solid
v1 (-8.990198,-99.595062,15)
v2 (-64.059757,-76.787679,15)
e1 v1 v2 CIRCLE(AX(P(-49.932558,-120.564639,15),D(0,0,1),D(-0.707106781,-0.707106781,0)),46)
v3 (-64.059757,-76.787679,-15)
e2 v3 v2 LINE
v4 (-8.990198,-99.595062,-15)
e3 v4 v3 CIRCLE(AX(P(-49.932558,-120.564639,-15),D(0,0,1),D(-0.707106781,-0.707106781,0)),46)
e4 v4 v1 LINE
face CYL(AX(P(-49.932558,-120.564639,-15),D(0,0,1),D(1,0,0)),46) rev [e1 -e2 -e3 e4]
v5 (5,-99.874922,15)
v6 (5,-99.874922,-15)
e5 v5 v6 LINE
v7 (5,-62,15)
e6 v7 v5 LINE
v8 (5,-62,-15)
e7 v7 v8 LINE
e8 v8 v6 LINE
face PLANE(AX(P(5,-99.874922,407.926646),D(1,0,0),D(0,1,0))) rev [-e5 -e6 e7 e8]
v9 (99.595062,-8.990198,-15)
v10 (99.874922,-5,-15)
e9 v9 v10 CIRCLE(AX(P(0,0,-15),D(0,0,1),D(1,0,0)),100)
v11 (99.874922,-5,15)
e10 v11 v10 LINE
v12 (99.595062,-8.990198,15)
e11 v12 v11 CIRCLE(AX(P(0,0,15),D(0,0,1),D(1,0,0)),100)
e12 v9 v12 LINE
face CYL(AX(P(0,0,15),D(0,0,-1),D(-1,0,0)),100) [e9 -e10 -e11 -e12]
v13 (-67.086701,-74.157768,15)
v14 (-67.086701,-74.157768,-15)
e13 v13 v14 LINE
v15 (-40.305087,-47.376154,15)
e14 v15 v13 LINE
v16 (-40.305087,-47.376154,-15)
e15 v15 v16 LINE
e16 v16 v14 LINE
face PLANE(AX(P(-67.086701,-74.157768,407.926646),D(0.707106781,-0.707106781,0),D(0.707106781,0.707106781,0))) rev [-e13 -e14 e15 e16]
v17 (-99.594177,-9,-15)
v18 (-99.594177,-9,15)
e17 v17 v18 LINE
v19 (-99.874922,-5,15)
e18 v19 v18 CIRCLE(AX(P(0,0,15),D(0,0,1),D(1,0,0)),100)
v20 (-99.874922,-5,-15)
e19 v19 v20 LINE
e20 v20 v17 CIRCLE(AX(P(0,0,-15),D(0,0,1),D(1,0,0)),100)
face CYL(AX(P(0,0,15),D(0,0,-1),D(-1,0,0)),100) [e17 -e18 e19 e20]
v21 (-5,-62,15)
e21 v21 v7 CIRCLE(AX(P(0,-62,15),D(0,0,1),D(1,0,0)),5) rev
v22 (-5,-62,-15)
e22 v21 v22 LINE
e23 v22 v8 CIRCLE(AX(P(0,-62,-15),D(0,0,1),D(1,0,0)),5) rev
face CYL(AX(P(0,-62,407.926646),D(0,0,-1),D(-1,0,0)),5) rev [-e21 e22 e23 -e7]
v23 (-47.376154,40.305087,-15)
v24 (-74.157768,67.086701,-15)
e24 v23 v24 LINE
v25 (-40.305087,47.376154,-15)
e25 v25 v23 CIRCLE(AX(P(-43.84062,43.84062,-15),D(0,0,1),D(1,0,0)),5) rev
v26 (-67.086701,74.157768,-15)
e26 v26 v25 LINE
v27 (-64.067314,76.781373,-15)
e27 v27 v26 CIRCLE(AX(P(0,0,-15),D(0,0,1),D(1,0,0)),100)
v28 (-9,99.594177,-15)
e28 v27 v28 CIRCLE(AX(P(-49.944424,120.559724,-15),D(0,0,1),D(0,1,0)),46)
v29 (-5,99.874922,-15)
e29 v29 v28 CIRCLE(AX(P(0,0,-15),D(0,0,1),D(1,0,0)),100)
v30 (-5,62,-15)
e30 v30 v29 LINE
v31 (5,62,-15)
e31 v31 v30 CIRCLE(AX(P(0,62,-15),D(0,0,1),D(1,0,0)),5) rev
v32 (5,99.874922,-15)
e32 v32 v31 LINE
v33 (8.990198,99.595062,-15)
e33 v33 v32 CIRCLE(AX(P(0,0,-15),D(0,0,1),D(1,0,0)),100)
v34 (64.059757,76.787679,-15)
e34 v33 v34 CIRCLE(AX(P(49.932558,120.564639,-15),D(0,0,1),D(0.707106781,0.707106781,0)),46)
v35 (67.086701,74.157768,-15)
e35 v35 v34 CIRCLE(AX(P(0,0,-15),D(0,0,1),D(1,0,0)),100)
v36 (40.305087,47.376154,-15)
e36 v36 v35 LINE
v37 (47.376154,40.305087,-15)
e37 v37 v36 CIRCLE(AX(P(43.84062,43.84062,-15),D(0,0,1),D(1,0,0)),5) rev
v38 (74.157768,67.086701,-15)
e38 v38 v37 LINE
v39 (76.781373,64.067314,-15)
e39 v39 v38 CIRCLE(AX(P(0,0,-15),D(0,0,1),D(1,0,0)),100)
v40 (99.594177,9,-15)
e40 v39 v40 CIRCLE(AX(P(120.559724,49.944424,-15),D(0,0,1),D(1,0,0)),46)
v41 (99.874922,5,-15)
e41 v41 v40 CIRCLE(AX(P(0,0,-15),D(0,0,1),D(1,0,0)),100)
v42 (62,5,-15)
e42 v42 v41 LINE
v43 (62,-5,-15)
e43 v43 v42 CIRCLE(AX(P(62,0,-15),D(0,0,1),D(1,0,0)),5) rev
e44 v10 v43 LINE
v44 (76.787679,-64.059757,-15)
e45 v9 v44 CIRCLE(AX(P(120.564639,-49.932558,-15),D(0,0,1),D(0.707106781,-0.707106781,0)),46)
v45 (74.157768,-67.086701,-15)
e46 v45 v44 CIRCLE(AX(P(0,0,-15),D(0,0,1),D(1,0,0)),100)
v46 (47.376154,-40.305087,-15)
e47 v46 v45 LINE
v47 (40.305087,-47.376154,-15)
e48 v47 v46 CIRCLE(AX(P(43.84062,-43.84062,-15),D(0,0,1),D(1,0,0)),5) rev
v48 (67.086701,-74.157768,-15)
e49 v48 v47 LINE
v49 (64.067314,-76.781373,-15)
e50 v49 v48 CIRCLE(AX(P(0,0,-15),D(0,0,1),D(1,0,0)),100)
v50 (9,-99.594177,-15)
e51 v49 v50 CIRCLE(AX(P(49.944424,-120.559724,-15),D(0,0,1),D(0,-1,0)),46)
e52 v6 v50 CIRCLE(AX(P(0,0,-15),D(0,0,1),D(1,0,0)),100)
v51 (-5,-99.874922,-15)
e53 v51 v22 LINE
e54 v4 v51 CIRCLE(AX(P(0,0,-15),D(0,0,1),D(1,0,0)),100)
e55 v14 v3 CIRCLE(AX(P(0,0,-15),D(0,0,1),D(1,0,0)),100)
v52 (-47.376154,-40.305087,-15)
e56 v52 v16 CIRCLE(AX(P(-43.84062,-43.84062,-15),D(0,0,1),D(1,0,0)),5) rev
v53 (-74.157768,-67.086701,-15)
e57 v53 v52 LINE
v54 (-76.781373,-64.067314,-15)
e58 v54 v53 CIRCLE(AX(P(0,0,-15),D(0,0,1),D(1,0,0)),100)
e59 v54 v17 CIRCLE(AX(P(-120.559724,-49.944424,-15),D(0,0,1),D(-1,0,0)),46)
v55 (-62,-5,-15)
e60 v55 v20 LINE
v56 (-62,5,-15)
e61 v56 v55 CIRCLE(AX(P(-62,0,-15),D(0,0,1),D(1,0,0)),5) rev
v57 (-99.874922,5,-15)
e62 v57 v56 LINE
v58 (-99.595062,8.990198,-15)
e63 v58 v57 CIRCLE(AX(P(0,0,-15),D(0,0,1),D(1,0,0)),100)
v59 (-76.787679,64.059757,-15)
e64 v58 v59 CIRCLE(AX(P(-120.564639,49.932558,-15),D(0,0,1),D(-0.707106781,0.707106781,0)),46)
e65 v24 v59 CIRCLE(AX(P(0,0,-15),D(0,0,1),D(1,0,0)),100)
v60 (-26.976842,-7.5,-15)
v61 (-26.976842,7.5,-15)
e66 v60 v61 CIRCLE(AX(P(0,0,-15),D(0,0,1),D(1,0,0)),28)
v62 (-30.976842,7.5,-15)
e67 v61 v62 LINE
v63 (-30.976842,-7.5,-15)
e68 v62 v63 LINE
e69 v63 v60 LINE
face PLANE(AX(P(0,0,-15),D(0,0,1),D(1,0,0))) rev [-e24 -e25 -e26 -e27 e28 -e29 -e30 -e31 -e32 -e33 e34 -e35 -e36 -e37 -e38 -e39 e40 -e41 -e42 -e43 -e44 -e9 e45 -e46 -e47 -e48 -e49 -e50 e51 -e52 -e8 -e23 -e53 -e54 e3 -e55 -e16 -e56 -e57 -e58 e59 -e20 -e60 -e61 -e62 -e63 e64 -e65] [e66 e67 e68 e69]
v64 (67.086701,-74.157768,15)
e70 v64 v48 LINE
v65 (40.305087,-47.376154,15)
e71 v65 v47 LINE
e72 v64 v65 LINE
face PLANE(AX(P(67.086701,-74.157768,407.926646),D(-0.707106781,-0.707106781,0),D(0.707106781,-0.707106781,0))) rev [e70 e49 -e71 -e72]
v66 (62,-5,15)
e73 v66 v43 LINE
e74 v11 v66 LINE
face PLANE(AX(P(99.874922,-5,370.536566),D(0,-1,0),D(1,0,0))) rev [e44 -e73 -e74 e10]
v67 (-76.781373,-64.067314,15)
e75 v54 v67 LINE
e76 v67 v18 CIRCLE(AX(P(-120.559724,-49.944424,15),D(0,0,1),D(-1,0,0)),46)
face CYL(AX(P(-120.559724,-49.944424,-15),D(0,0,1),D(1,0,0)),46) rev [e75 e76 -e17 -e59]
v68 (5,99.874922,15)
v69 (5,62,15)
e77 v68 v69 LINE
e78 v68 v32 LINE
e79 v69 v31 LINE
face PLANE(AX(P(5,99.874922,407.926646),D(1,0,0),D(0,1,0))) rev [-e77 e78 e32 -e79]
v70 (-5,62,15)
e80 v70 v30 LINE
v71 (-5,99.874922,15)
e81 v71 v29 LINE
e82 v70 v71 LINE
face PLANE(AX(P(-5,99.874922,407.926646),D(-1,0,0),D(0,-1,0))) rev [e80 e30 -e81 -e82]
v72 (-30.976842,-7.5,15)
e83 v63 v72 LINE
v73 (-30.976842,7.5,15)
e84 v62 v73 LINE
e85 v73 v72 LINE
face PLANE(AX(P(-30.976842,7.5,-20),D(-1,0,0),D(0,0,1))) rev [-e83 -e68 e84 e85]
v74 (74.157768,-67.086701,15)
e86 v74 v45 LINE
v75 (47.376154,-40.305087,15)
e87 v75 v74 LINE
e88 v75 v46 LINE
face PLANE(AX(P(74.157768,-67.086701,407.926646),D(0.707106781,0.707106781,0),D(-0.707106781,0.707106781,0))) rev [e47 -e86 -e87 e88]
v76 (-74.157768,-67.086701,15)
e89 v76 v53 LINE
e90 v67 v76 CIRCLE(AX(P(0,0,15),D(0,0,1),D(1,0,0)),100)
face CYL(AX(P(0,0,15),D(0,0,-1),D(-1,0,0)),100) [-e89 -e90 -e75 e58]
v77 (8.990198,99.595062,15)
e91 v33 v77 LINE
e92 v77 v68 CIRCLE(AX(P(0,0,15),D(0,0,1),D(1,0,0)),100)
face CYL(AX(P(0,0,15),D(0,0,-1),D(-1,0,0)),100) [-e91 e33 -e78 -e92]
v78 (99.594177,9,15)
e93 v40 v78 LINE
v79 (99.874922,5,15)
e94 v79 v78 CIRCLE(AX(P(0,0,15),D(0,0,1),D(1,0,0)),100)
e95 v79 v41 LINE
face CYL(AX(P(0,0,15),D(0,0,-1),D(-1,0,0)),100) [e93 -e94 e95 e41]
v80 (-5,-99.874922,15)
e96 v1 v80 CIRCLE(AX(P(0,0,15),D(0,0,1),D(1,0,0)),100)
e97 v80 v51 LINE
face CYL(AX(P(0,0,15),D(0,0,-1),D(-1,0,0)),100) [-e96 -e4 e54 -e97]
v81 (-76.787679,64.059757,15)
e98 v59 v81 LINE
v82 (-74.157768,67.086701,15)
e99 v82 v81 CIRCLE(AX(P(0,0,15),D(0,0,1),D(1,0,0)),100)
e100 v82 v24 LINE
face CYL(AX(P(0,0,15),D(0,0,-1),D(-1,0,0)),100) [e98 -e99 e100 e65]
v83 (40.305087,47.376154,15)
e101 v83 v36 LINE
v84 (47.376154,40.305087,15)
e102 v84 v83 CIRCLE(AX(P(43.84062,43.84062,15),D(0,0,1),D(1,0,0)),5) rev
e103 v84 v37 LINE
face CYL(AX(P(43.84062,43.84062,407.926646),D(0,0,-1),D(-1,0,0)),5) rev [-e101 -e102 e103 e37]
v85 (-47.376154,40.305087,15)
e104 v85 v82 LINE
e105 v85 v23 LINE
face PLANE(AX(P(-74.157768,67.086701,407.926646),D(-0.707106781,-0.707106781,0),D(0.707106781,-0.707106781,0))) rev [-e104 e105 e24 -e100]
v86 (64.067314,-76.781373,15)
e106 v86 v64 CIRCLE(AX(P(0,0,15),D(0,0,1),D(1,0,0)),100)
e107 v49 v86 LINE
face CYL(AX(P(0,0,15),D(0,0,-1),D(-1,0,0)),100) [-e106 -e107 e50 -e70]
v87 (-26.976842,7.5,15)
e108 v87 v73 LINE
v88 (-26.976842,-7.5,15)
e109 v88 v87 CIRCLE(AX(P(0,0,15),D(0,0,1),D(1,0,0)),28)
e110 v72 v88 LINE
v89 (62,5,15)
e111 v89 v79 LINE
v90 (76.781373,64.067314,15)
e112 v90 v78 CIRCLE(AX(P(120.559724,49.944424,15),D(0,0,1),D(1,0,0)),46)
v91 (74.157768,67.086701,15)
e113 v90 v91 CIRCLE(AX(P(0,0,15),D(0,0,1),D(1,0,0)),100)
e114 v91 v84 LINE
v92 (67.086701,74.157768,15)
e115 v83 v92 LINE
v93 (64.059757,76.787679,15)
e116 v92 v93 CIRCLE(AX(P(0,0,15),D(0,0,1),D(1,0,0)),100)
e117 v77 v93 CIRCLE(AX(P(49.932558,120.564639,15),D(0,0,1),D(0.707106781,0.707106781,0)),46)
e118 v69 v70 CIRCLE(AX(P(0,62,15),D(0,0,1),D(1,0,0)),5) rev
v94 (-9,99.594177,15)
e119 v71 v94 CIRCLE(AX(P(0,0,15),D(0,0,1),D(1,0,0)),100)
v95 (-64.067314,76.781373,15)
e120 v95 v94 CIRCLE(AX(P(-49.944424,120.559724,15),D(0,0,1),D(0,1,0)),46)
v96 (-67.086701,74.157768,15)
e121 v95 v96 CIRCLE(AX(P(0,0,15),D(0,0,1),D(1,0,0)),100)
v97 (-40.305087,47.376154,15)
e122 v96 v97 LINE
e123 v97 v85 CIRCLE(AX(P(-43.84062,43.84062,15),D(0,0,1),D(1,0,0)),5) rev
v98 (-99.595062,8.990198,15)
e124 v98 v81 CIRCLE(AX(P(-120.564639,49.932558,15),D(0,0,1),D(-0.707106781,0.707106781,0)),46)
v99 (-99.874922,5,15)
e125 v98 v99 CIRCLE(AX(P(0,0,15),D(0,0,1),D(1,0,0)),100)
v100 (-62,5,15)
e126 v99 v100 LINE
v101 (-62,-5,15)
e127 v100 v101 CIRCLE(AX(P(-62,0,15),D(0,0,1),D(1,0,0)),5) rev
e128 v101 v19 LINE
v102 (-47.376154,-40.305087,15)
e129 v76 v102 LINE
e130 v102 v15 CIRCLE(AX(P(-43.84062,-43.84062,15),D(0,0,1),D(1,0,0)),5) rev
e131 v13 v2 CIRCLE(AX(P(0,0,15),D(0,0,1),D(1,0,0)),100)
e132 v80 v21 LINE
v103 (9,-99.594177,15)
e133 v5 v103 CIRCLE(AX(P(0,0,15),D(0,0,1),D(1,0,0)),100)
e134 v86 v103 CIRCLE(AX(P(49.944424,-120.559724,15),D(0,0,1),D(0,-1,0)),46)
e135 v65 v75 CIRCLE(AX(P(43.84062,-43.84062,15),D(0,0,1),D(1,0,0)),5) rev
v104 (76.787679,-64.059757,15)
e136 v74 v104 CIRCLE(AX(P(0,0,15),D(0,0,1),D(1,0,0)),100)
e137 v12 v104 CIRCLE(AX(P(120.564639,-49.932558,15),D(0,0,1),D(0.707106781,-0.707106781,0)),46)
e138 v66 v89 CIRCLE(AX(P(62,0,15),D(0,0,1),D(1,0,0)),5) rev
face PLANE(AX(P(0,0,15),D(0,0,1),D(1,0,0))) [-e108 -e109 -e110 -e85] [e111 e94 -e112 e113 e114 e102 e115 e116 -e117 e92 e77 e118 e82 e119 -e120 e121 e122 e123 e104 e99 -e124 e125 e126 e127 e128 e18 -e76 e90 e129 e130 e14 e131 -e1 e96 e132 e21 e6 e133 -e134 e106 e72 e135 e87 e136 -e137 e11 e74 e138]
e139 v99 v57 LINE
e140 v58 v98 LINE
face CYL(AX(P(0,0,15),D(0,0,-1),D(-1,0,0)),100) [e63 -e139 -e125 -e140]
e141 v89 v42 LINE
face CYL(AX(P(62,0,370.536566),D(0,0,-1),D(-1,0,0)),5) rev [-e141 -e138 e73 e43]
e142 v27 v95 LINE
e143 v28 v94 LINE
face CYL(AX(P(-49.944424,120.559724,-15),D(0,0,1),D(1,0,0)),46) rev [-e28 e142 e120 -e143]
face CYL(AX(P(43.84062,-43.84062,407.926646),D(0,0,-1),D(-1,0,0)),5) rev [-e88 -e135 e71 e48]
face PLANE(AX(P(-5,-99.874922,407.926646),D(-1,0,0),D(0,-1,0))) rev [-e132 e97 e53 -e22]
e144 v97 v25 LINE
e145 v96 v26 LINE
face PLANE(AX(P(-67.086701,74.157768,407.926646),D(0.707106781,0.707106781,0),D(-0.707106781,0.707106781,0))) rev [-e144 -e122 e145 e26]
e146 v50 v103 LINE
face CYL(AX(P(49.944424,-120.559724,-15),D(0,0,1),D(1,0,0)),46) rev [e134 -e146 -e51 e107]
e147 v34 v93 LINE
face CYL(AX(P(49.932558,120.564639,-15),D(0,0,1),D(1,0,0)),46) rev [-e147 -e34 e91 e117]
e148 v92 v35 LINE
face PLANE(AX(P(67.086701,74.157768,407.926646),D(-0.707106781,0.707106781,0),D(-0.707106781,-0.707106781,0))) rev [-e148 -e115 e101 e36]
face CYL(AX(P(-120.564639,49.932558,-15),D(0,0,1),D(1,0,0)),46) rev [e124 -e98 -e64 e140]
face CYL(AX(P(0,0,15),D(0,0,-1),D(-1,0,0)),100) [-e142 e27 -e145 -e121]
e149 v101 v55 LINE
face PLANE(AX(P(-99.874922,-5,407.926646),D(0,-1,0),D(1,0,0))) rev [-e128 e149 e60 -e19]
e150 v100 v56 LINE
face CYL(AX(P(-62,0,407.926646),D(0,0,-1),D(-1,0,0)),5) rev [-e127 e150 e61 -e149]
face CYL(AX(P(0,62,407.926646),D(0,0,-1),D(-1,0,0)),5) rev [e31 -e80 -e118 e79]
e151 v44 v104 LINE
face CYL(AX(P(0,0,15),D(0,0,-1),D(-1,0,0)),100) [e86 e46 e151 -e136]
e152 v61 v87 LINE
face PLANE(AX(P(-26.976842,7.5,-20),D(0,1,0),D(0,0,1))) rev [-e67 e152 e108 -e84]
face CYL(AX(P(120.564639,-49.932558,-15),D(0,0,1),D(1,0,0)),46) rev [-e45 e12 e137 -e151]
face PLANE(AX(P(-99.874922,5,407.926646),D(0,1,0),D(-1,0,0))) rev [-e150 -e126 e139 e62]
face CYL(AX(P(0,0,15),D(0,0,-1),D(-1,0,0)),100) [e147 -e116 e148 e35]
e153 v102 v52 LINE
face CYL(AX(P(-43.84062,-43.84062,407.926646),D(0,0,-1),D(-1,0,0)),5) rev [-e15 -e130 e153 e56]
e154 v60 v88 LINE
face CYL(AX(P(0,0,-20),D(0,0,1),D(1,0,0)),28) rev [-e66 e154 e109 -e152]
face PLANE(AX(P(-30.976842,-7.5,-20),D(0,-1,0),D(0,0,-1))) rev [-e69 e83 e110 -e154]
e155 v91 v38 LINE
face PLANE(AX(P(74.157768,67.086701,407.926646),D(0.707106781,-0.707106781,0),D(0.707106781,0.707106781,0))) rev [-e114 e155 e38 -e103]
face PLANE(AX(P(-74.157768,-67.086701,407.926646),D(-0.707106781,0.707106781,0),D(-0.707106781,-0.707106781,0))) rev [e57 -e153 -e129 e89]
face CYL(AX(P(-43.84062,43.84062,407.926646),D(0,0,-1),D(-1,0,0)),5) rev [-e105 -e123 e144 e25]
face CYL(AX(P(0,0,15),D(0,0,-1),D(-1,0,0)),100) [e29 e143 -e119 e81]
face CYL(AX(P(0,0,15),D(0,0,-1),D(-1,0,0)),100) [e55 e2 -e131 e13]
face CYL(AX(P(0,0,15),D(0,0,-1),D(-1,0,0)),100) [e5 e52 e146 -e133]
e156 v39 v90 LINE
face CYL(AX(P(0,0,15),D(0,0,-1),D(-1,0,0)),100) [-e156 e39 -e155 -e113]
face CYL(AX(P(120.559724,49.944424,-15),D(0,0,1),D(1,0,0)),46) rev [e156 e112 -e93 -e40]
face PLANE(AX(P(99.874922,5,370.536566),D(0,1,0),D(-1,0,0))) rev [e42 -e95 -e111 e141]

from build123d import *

# Parameters (mm, degrees)
SKETCH1_R           = 100
BOSS_EXTRUDE1_DEPTH = 15
CUT_EXTRUDE2_START  = -30
CUT_EXTRUDE2_DEPTH  = 30
CIRPATTERN1_COUNT   = 8
CUT_EXTRUDE3_DEPTH  = 30
CIRPATTERN2_COUNT   = 8
CUT_EXTRUDE4_DEPTH  = 35


# Read off the part's stored shape, not the designer's step: Cut-Extrude2
with BuildPart() as part:
    # Sketch1 → Boss-Extrude1 (new, symmetric)
    with BuildSketch(Plane.XY):
        Circle(SKETCH1_R)
    extrude(amount=BOSS_EXTRUDE1_DEPTH, both=True)

    # Cut-Extrude2 outline → Cut-Extrude2 (cut)
    with BuildSketch(Plane.XY.offset(15).offset(CUT_EXTRUDE2_START)):
        with BuildLine():
            ThreePointArc((62, 5), (57, 0), (62, -5))
            Line((62, -5), (99.874921777, -5))
            ThreePointArc((99.874921777, -5), (100, 0), (99.874921777, 5))
            Line((99.874921777, 5), (62, 5))
        make_face()
    cut_extrude2 = extrude(amount=CUT_EXTRUDE2_DEPTH, mode=Mode.SUBTRACT)

    # CirPattern1: Cut-Extrude2 ×8 about axis
    cirpattern1_axis = Axis((0, 0, 15), (0, 0, -1))
    for i in range(1, CIRPATTERN1_COUNT):
        add(cut_extrude2.rotate(cirpattern1_axis, i * 360 / CIRPATTERN1_COUNT), mode=Mode.SUBTRACT)

    # Sketch8 → Cut-Extrude3 (cut)
    with BuildSketch(Plane.XY.offset(15)):
        with BuildLine():
            ThreePointArc((76.781373425, 64.06731378), (78.062131756, 32.338894345), (99.594176537, 9))
            ThreePointArc((99.594176537, 9), (92.386069934, 38.27288965), (76.781373425, 64.06731378))
        make_face()
    cut_extrude3 = extrude(amount=-CUT_EXTRUDE3_DEPTH, mode=Mode.SUBTRACT)

    # CirPattern2: Cut-Extrude3 ×8 about axis
    cirpattern2_axis = Axis((0, 0, 0), (0, 0, 1))
    for i in range(1, CIRPATTERN2_COUNT):
        add(cut_extrude3.rotate(cirpattern2_axis, i * 360 / CIRPATTERN2_COUNT), mode=Mode.SUBTRACT)

    # Sketch9 → Cut-Extrude4 (cut, symmetric)
    with BuildSketch(Plane.XY.offset(15)):
        with BuildLine():
            Line((-26.97684192, 7.5), (-30.97684192, 7.5))
            Line((-30.97684192, 7.5), (-30.97684192, -7.5))
            Line((-30.97684192, -7.5), (-26.97684192, -7.5))
            ThreePointArc((-26.97684192, -7.5), (28, 0), (-26.97684192, 7.5))
        make_face()
    extrude(amount=CUT_EXTRUDE4_DEPTH, both=True, mode=Mode.SUBTRACT)


solid = part.part
